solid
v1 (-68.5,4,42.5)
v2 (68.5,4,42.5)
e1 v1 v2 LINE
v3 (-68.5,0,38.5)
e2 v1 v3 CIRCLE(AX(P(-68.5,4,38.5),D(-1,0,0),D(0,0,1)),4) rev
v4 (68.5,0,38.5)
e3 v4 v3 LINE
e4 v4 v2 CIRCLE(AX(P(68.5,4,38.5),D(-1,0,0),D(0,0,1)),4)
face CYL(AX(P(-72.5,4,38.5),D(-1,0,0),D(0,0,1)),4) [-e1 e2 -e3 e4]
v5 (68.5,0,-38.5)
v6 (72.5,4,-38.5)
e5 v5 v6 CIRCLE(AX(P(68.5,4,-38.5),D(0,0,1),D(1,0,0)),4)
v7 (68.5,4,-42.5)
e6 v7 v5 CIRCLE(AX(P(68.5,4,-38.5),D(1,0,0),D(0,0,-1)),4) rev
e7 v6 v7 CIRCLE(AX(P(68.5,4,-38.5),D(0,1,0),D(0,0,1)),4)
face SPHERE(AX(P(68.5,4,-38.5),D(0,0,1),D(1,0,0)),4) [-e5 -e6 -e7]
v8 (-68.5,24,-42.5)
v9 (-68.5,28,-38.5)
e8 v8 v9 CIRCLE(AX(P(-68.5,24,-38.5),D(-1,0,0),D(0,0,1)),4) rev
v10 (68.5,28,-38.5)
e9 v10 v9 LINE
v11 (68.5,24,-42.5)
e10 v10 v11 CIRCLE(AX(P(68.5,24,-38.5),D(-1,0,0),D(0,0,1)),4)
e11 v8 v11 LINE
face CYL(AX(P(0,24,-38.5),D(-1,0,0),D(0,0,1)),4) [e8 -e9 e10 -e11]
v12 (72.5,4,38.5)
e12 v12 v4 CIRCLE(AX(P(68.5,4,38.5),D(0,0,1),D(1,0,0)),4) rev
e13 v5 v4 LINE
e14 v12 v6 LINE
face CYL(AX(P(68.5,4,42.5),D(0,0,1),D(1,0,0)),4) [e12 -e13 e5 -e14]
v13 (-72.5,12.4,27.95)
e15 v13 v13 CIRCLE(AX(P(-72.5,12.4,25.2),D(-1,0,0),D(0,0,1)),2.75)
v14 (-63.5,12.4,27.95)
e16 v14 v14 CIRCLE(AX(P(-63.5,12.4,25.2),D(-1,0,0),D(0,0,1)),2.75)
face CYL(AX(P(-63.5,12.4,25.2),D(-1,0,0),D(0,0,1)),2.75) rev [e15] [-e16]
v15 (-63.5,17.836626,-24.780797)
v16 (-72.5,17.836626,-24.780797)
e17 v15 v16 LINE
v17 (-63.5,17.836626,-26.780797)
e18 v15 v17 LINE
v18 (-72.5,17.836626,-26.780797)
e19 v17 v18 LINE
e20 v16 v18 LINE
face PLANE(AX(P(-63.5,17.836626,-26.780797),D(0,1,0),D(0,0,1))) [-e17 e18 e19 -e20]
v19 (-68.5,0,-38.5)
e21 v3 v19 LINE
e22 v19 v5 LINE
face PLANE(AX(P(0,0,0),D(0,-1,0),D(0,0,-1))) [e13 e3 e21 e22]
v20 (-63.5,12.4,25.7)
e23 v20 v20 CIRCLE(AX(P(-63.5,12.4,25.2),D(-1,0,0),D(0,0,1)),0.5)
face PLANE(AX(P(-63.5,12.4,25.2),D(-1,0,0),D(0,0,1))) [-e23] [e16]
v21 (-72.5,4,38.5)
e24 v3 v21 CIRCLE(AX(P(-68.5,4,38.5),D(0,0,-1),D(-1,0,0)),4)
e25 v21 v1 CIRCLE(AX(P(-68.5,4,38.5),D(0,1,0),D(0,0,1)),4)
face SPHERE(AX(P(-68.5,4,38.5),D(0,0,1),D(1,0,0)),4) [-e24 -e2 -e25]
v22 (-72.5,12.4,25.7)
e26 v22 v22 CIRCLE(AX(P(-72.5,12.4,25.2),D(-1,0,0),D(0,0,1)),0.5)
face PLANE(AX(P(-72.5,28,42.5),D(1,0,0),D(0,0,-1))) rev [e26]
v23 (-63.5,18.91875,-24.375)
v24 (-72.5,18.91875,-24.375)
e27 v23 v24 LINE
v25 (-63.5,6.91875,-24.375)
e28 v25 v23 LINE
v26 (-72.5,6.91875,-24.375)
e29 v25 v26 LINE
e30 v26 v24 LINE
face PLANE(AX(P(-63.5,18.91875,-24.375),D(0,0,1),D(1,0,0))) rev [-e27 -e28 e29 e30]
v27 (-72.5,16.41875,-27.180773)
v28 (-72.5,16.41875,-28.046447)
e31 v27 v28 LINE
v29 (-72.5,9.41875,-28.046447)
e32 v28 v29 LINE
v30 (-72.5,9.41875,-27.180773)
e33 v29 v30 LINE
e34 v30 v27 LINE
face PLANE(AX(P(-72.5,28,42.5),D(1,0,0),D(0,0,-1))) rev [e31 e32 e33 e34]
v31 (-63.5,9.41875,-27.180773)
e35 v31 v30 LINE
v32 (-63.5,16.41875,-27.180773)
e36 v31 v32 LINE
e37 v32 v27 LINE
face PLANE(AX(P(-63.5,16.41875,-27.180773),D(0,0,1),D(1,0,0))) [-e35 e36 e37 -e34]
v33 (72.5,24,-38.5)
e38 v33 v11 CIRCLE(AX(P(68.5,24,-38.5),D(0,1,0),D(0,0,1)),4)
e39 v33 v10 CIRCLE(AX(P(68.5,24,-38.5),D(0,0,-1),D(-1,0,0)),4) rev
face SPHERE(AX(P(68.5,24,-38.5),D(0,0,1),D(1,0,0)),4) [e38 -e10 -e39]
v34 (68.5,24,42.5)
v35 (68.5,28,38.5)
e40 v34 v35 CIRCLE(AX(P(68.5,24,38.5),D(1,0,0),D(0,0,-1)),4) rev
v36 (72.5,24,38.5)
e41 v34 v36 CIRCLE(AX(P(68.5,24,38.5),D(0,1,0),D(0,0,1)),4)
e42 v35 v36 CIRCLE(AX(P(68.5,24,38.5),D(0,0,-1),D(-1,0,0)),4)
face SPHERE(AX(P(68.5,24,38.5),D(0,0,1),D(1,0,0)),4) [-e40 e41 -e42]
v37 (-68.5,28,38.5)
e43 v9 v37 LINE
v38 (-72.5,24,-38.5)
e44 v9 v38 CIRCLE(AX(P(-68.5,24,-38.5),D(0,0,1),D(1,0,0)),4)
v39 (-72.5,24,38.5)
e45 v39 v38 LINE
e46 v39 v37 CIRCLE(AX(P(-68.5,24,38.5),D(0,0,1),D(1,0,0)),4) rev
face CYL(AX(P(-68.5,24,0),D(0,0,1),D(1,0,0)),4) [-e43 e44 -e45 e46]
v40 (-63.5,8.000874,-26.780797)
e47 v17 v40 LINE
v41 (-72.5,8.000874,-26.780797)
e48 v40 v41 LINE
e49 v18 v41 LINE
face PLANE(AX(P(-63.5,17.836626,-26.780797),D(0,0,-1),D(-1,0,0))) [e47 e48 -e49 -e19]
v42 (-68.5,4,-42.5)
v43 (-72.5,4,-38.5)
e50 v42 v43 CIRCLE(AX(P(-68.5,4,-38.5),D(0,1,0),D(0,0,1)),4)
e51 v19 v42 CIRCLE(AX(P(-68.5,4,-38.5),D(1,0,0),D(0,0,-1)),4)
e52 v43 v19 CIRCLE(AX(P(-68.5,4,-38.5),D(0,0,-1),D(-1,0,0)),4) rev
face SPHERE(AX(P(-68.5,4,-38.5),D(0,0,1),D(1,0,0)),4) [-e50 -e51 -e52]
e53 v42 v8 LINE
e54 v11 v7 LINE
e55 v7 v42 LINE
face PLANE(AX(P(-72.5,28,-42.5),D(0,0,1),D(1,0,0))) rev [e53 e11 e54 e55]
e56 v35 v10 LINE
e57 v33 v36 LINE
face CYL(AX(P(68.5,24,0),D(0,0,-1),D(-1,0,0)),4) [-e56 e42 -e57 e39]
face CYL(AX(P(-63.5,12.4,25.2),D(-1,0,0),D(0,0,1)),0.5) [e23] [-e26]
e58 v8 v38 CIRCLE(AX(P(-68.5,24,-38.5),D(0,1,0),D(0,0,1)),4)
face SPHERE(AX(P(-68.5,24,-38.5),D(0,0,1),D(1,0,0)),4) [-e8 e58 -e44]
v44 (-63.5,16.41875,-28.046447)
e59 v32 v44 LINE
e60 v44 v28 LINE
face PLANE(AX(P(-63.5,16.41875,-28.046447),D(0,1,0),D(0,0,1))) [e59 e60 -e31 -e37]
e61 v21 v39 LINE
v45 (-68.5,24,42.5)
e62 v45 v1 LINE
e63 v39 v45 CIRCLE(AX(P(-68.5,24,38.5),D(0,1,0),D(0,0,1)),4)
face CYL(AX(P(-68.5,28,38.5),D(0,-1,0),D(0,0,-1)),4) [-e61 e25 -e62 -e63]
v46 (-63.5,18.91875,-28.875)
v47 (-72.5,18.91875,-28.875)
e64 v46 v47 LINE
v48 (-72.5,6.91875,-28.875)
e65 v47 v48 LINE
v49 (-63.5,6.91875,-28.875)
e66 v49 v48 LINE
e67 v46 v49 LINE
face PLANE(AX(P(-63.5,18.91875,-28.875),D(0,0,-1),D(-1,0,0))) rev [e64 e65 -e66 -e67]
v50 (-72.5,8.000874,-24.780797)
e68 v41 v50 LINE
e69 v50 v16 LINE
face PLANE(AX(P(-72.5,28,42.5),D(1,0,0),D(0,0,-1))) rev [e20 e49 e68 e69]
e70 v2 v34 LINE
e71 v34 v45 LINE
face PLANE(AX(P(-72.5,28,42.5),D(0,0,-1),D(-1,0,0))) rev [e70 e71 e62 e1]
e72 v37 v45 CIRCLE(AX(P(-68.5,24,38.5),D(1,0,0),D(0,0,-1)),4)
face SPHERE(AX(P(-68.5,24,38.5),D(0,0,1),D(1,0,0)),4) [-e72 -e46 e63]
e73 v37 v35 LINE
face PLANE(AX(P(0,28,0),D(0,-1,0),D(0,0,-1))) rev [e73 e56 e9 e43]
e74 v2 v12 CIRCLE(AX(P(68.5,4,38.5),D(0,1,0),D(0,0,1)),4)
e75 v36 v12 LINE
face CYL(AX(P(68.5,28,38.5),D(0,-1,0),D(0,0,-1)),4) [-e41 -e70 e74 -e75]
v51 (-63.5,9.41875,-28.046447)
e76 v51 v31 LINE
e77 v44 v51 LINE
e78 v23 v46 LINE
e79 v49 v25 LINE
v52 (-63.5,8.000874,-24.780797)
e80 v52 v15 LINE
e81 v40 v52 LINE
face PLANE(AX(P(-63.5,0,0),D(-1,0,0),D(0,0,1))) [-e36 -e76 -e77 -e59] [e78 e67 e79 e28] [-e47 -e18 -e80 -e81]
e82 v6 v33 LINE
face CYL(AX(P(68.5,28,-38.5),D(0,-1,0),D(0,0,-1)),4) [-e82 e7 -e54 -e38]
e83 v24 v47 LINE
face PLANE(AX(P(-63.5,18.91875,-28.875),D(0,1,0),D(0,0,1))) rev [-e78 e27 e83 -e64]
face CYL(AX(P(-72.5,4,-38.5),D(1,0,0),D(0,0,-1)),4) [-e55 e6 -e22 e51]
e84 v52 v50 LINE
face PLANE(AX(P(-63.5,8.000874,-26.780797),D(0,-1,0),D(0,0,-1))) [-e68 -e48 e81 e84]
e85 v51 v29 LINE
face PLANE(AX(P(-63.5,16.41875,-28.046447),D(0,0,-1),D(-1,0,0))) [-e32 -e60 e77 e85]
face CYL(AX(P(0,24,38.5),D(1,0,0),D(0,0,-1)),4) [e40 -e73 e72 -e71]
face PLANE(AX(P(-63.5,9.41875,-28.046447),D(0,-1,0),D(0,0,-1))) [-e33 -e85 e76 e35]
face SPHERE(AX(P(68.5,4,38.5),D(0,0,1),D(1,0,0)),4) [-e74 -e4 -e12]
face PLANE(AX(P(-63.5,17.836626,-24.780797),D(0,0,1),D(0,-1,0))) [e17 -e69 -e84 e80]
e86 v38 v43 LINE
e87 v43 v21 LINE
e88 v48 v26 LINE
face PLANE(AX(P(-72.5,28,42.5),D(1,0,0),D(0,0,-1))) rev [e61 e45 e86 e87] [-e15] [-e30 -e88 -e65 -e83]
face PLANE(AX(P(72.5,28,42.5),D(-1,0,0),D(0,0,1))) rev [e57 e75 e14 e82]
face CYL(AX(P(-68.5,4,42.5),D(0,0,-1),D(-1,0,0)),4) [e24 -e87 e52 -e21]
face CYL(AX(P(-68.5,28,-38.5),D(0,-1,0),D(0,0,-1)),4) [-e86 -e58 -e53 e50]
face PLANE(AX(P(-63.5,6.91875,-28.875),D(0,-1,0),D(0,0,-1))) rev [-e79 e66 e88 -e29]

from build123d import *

# Parameters (mm, degrees)
IZIM1_W                     = 145
IZIM1_H                     = 85
Y_KSEKLIK_EKSTR_ZYON1_DEPTH = 28
IZIM2_R                     = 2.75
IZIM2_R_2                   = 0.5
KES_EKSTR_ZYON1_DEPTH       = 9
IZIM3_W                     = 4.5
IZIM3_H                     = 12
IZIM3_W_2                   = 2
IZIM3_H_2                   = 9.835751208
IZIM3_W_3                   = 0.86567422
IZIM3_H_3                   = 7
KES_EKSTR_ZYON2_DEPTH       = 9
RADYUS3_R                   = 4
RADYUS6_R                   = 4
RADYUS7_R                   = 4


with BuildPart() as part:
    # Çizim1 → Yükseklik-Ekstrüzyon1 (new body)
    with BuildSketch(Plane(origin=(0, 0, 0), x_dir=(1, 0, 0), z_dir=(0, 1, 0))):
        Rectangle(IZIM1_W, IZIM1_H)
    extrude(amount=Y_KSEKLIK_EKSTR_ZYON1_DEPTH)

    # Çizim2 → Kes-Ekstrüzyon1 (cut)
    with BuildSketch(Plane.ZY.offset(72.5)):
        with Locations((25.2, 12.4)):
            Circle(IZIM2_R)
        with Locations((25.2, 12.4)):
            Circle(IZIM2_R_2, mode=Mode.SUBTRACT)
    extrude(amount=-KES_EKSTR_ZYON1_DEPTH, mode=Mode.SUBTRACT)

    # Çizim3 → Kes-Ekstrüzyon2 (cut)
    with BuildSketch(Plane.ZY.offset(72.5)):
        with Locations((-26.625, 12.91875)):
            Rectangle(IZIM3_W, IZIM3_H)
        with Locations((-25.780796649, 12.91875)):
            Rectangle(IZIM3_W_2, IZIM3_H_2, mode=Mode.SUBTRACT)
        with Locations((-27.613610368, 12.91875)):
            Rectangle(IZIM3_W_3, IZIM3_H_3, mode=Mode.SUBTRACT)
    extrude(amount=-KES_EKSTR_ZYON2_DEPTH, mode=Mode.SUBTRACT)

    # Radyus3
    radyus3_edges = [part.edges().sort_by_distance(p)[0] for p in [
        (-72.5, 28, 0),
        (0, 28, 42.5),
        (72.5, 28, 0),
        (0, 28, -42.5),
    ]]
    fillet(radyus3_edges, radius=RADYUS3_R)

    # Radyus6
    radyus6_edges = [part.edges().sort_by_distance(p)[0] for p in [
        (0, 0, 42.5),
        (-72.5, 0, 0),
        (0, 0, -42.5),
        (72.5, 0, 0),
    ]]
    fillet(radyus6_edges, radius=RADYUS6_R)

    # Radyus7
    # the kernel refuses this fillet: 4 mm, written as the material it takes off along each edge
    with BuildSketch(Plane(origin=(-68.5, 24, 38.5), x_dir=(-1, 0, 0), z_dir=(0, 0, 1))) as radyus7_piece_1_section:
        Polygon((0, 0), (RADYUS7_R, 0), (RADYUS7_R, -RADYUS7_R), (0, -RADYUS7_R), align=None)
    radyus7_piece_1 = extrude(amount=RADYUS7_R, mode=Mode.PRIVATE)
    radyus7_piece_1 = radyus7_piece_1 - Plane(origin=(-68.5, 24, 38.5), x_dir=(0.7071067811865475, -0.7071067811865475, 0), z_dir=(0, 0, 1)) * Sphere(RADYUS7_R, mode=Mode.PRIVATE)
    add(radyus7_piece_1, mode=Mode.SUBTRACT)
    with BuildSketch(Plane(origin=(-68.5, 24, -38.5), x_dir=(0, 0, -1), z_dir=(-1, 0, 0))) as radyus7_piece_2_section:
        Polygon((0, 0), (RADYUS7_R, 0), (RADYUS7_R, -RADYUS7_R), (0, -RADYUS7_R), align=None)
    radyus7_piece_2 = extrude(amount=RADYUS7_R, mode=Mode.PRIVATE)
    radyus7_piece_2 = radyus7_piece_2 - Plane(origin=(-68.5, 24, -38.5), x_dir=(0, -0.7071067811865475, 0.7071067811865475), z_dir=(-1, 0, 0)) * Sphere(RADYUS7_R, mode=Mode.PRIVATE)
    add(radyus7_piece_2, mode=Mode.SUBTRACT)
    with BuildSketch(Plane(origin=(68.5, 24, 38.5), x_dir=(1, 0, 0), z_dir=(0, 0, 1))) as radyus7_piece_3_section:
        Polygon((0, 0), (RADYUS7_R, 0), (RADYUS7_R, RADYUS7_R), (0, RADYUS7_R), align=None)
    radyus7_piece_3 = extrude(amount=RADYUS7_R, mode=Mode.PRIVATE)
    radyus7_piece_3 = radyus7_piece_3 - Plane(origin=(68.5, 24, 38.5), x_dir=(-0.7071067811865475, -0.7071067811865475, 0), z_dir=(0, 0, 1)) * Sphere(RADYUS7_R, mode=Mode.PRIVATE)
    add(radyus7_piece_3, mode=Mode.SUBTRACT)
    with BuildSketch(Plane(origin=(68.5, 24, -38.5), x_dir=(0, 0, -1), z_dir=(1, 0, 0))) as radyus7_piece_4_section:
        Polygon((0, 0), (RADYUS7_R, 0), (RADYUS7_R, RADYUS7_R), (0, RADYUS7_R), align=None)
    radyus7_piece_4 = extrude(amount=RADYUS7_R, mode=Mode.PRIVATE)
    radyus7_piece_4 = radyus7_piece_4 - Plane(origin=(68.5, 24, -38.5), x_dir=(0, -0.7071067811865475, 0.7071067811865475), z_dir=(1, 0, 0)) * Sphere(RADYUS7_R, mode=Mode.PRIVATE)
    add(radyus7_piece_4, mode=Mode.SUBTRACT)
    with BuildSketch(Plane(origin=(68.5, 4, 38.5), x_dir=(1, 0, 0), z_dir=(0, 0, 1))) as radyus7_piece_5_section:
        Polygon((0, 0), (RADYUS7_R, 0), (RADYUS7_R, -RADYUS7_R), (0, -RADYUS7_R), align=None)
    radyus7_piece_5 = extrude(amount=RADYUS7_R, mode=Mode.PRIVATE)
    radyus7_piece_5 = radyus7_piece_5 - Plane(origin=(68.5, 4, 38.5), x_dir=(-0.7071067811865475, 0.7071067811865475, 0), z_dir=(0, 0, 1)) * Sphere(RADYUS7_R, mode=Mode.PRIVATE)
    add(radyus7_piece_5, mode=Mode.SUBTRACT)
    with BuildSketch(Plane(origin=(-68.5, 4, 38.5), x_dir=(-1, 0, 0), z_dir=(0, 0, 1))) as radyus7_piece_6_section:
        Polygon((0, 0), (RADYUS7_R, 0), (RADYUS7_R, RADYUS7_R), (0, RADYUS7_R), align=None)
    radyus7_piece_6 = extrude(amount=RADYUS7_R, mode=Mode.PRIVATE)
    radyus7_piece_6 = radyus7_piece_6 - Plane(origin=(-68.5, 4, 38.5), x_dir=(0.7071067811865475, 0.7071067811865475, 0), z_dir=(0, 0, 1)) * Sphere(RADYUS7_R, mode=Mode.PRIVATE)
    add(radyus7_piece_6, mode=Mode.SUBTRACT)
    with BuildSketch(Plane(origin=(68.5, 4, -38.5), x_dir=(0, 0, -1), z_dir=(1, 0, 0))) as radyus7_piece_7_section:
        Polygon((0, 0), (RADYUS7_R, 0), (RADYUS7_R, -RADYUS7_R), (0, -RADYUS7_R), align=None)
    radyus7_piece_7 = extrude(amount=RADYUS7_R, mode=Mode.PRIVATE)
    radyus7_piece_7 = radyus7_piece_7 - Plane(origin=(68.5, 4, -38.5), x_dir=(0, 0.7071067811865475, 0.7071067811865475), z_dir=(1, 0, 0)) * Sphere(RADYUS7_R, mode=Mode.PRIVATE)
    add(radyus7_piece_7, mode=Mode.SUBTRACT)
    with BuildSketch(Plane(origin=(-68.5, 4, -38.5), x_dir=(0, 0, -1), z_dir=(-1, 0, 0))) as radyus7_piece_8_section:
        Polygon((0, 0), (RADYUS7_R, 0), (RADYUS7_R, RADYUS7_R), (0, RADYUS7_R), align=None)
    radyus7_piece_8 = extrude(amount=RADYUS7_R, mode=Mode.PRIVATE)
    radyus7_piece_8 = radyus7_piece_8 - Plane(origin=(-68.5, 4, -38.5), x_dir=(0, 0.7071067811865475, 0.7071067811865475), z_dir=(-1, 0, 0)) * Sphere(RADYUS7_R, mode=Mode.PRIVATE)
    add(radyus7_piece_8, mode=Mode.SUBTRACT)
    with BuildSketch(Plane(origin=(72.5, 4, -42.5), x_dir=(0, 0, 1), z_dir=(0, 1, 0)), Plane(origin=(72.5, 4, 42.5), x_dir=(-1, 0, 0), z_dir=(0, 1, 0))) as radyus7_piece_9:
        with BuildLine():
            CenterArc((RADYUS7_R, -RADYUS7_R), RADYUS7_R, 90, 90)
            Line((0, -RADYUS7_R), (0, 0))
            Line((0, 0), (RADYUS7_R, 0))
        make_face()
    extrude(amount=20, mode=Mode.SUBTRACT)
    with BuildSketch(Plane(origin=(-72.5, 4, -42.5), x_dir=(0, 0, 1), z_dir=(0, 1, 0)), Plane(origin=(-72.5, 4, 42.5), x_dir=(1, 0, 0), z_dir=(0, 1, 0))) as radyus7_piece_10:
        with BuildLine():
            CenterArc((RADYUS7_R, RADYUS7_R), RADYUS7_R, 180, 90)
            Line((0, RADYUS7_R), (0, 0))
            Line((0, 0), (RADYUS7_R, 0))
        make_face()
    extrude(amount=20, mode=Mode.SUBTRACT)


solid = part.part
